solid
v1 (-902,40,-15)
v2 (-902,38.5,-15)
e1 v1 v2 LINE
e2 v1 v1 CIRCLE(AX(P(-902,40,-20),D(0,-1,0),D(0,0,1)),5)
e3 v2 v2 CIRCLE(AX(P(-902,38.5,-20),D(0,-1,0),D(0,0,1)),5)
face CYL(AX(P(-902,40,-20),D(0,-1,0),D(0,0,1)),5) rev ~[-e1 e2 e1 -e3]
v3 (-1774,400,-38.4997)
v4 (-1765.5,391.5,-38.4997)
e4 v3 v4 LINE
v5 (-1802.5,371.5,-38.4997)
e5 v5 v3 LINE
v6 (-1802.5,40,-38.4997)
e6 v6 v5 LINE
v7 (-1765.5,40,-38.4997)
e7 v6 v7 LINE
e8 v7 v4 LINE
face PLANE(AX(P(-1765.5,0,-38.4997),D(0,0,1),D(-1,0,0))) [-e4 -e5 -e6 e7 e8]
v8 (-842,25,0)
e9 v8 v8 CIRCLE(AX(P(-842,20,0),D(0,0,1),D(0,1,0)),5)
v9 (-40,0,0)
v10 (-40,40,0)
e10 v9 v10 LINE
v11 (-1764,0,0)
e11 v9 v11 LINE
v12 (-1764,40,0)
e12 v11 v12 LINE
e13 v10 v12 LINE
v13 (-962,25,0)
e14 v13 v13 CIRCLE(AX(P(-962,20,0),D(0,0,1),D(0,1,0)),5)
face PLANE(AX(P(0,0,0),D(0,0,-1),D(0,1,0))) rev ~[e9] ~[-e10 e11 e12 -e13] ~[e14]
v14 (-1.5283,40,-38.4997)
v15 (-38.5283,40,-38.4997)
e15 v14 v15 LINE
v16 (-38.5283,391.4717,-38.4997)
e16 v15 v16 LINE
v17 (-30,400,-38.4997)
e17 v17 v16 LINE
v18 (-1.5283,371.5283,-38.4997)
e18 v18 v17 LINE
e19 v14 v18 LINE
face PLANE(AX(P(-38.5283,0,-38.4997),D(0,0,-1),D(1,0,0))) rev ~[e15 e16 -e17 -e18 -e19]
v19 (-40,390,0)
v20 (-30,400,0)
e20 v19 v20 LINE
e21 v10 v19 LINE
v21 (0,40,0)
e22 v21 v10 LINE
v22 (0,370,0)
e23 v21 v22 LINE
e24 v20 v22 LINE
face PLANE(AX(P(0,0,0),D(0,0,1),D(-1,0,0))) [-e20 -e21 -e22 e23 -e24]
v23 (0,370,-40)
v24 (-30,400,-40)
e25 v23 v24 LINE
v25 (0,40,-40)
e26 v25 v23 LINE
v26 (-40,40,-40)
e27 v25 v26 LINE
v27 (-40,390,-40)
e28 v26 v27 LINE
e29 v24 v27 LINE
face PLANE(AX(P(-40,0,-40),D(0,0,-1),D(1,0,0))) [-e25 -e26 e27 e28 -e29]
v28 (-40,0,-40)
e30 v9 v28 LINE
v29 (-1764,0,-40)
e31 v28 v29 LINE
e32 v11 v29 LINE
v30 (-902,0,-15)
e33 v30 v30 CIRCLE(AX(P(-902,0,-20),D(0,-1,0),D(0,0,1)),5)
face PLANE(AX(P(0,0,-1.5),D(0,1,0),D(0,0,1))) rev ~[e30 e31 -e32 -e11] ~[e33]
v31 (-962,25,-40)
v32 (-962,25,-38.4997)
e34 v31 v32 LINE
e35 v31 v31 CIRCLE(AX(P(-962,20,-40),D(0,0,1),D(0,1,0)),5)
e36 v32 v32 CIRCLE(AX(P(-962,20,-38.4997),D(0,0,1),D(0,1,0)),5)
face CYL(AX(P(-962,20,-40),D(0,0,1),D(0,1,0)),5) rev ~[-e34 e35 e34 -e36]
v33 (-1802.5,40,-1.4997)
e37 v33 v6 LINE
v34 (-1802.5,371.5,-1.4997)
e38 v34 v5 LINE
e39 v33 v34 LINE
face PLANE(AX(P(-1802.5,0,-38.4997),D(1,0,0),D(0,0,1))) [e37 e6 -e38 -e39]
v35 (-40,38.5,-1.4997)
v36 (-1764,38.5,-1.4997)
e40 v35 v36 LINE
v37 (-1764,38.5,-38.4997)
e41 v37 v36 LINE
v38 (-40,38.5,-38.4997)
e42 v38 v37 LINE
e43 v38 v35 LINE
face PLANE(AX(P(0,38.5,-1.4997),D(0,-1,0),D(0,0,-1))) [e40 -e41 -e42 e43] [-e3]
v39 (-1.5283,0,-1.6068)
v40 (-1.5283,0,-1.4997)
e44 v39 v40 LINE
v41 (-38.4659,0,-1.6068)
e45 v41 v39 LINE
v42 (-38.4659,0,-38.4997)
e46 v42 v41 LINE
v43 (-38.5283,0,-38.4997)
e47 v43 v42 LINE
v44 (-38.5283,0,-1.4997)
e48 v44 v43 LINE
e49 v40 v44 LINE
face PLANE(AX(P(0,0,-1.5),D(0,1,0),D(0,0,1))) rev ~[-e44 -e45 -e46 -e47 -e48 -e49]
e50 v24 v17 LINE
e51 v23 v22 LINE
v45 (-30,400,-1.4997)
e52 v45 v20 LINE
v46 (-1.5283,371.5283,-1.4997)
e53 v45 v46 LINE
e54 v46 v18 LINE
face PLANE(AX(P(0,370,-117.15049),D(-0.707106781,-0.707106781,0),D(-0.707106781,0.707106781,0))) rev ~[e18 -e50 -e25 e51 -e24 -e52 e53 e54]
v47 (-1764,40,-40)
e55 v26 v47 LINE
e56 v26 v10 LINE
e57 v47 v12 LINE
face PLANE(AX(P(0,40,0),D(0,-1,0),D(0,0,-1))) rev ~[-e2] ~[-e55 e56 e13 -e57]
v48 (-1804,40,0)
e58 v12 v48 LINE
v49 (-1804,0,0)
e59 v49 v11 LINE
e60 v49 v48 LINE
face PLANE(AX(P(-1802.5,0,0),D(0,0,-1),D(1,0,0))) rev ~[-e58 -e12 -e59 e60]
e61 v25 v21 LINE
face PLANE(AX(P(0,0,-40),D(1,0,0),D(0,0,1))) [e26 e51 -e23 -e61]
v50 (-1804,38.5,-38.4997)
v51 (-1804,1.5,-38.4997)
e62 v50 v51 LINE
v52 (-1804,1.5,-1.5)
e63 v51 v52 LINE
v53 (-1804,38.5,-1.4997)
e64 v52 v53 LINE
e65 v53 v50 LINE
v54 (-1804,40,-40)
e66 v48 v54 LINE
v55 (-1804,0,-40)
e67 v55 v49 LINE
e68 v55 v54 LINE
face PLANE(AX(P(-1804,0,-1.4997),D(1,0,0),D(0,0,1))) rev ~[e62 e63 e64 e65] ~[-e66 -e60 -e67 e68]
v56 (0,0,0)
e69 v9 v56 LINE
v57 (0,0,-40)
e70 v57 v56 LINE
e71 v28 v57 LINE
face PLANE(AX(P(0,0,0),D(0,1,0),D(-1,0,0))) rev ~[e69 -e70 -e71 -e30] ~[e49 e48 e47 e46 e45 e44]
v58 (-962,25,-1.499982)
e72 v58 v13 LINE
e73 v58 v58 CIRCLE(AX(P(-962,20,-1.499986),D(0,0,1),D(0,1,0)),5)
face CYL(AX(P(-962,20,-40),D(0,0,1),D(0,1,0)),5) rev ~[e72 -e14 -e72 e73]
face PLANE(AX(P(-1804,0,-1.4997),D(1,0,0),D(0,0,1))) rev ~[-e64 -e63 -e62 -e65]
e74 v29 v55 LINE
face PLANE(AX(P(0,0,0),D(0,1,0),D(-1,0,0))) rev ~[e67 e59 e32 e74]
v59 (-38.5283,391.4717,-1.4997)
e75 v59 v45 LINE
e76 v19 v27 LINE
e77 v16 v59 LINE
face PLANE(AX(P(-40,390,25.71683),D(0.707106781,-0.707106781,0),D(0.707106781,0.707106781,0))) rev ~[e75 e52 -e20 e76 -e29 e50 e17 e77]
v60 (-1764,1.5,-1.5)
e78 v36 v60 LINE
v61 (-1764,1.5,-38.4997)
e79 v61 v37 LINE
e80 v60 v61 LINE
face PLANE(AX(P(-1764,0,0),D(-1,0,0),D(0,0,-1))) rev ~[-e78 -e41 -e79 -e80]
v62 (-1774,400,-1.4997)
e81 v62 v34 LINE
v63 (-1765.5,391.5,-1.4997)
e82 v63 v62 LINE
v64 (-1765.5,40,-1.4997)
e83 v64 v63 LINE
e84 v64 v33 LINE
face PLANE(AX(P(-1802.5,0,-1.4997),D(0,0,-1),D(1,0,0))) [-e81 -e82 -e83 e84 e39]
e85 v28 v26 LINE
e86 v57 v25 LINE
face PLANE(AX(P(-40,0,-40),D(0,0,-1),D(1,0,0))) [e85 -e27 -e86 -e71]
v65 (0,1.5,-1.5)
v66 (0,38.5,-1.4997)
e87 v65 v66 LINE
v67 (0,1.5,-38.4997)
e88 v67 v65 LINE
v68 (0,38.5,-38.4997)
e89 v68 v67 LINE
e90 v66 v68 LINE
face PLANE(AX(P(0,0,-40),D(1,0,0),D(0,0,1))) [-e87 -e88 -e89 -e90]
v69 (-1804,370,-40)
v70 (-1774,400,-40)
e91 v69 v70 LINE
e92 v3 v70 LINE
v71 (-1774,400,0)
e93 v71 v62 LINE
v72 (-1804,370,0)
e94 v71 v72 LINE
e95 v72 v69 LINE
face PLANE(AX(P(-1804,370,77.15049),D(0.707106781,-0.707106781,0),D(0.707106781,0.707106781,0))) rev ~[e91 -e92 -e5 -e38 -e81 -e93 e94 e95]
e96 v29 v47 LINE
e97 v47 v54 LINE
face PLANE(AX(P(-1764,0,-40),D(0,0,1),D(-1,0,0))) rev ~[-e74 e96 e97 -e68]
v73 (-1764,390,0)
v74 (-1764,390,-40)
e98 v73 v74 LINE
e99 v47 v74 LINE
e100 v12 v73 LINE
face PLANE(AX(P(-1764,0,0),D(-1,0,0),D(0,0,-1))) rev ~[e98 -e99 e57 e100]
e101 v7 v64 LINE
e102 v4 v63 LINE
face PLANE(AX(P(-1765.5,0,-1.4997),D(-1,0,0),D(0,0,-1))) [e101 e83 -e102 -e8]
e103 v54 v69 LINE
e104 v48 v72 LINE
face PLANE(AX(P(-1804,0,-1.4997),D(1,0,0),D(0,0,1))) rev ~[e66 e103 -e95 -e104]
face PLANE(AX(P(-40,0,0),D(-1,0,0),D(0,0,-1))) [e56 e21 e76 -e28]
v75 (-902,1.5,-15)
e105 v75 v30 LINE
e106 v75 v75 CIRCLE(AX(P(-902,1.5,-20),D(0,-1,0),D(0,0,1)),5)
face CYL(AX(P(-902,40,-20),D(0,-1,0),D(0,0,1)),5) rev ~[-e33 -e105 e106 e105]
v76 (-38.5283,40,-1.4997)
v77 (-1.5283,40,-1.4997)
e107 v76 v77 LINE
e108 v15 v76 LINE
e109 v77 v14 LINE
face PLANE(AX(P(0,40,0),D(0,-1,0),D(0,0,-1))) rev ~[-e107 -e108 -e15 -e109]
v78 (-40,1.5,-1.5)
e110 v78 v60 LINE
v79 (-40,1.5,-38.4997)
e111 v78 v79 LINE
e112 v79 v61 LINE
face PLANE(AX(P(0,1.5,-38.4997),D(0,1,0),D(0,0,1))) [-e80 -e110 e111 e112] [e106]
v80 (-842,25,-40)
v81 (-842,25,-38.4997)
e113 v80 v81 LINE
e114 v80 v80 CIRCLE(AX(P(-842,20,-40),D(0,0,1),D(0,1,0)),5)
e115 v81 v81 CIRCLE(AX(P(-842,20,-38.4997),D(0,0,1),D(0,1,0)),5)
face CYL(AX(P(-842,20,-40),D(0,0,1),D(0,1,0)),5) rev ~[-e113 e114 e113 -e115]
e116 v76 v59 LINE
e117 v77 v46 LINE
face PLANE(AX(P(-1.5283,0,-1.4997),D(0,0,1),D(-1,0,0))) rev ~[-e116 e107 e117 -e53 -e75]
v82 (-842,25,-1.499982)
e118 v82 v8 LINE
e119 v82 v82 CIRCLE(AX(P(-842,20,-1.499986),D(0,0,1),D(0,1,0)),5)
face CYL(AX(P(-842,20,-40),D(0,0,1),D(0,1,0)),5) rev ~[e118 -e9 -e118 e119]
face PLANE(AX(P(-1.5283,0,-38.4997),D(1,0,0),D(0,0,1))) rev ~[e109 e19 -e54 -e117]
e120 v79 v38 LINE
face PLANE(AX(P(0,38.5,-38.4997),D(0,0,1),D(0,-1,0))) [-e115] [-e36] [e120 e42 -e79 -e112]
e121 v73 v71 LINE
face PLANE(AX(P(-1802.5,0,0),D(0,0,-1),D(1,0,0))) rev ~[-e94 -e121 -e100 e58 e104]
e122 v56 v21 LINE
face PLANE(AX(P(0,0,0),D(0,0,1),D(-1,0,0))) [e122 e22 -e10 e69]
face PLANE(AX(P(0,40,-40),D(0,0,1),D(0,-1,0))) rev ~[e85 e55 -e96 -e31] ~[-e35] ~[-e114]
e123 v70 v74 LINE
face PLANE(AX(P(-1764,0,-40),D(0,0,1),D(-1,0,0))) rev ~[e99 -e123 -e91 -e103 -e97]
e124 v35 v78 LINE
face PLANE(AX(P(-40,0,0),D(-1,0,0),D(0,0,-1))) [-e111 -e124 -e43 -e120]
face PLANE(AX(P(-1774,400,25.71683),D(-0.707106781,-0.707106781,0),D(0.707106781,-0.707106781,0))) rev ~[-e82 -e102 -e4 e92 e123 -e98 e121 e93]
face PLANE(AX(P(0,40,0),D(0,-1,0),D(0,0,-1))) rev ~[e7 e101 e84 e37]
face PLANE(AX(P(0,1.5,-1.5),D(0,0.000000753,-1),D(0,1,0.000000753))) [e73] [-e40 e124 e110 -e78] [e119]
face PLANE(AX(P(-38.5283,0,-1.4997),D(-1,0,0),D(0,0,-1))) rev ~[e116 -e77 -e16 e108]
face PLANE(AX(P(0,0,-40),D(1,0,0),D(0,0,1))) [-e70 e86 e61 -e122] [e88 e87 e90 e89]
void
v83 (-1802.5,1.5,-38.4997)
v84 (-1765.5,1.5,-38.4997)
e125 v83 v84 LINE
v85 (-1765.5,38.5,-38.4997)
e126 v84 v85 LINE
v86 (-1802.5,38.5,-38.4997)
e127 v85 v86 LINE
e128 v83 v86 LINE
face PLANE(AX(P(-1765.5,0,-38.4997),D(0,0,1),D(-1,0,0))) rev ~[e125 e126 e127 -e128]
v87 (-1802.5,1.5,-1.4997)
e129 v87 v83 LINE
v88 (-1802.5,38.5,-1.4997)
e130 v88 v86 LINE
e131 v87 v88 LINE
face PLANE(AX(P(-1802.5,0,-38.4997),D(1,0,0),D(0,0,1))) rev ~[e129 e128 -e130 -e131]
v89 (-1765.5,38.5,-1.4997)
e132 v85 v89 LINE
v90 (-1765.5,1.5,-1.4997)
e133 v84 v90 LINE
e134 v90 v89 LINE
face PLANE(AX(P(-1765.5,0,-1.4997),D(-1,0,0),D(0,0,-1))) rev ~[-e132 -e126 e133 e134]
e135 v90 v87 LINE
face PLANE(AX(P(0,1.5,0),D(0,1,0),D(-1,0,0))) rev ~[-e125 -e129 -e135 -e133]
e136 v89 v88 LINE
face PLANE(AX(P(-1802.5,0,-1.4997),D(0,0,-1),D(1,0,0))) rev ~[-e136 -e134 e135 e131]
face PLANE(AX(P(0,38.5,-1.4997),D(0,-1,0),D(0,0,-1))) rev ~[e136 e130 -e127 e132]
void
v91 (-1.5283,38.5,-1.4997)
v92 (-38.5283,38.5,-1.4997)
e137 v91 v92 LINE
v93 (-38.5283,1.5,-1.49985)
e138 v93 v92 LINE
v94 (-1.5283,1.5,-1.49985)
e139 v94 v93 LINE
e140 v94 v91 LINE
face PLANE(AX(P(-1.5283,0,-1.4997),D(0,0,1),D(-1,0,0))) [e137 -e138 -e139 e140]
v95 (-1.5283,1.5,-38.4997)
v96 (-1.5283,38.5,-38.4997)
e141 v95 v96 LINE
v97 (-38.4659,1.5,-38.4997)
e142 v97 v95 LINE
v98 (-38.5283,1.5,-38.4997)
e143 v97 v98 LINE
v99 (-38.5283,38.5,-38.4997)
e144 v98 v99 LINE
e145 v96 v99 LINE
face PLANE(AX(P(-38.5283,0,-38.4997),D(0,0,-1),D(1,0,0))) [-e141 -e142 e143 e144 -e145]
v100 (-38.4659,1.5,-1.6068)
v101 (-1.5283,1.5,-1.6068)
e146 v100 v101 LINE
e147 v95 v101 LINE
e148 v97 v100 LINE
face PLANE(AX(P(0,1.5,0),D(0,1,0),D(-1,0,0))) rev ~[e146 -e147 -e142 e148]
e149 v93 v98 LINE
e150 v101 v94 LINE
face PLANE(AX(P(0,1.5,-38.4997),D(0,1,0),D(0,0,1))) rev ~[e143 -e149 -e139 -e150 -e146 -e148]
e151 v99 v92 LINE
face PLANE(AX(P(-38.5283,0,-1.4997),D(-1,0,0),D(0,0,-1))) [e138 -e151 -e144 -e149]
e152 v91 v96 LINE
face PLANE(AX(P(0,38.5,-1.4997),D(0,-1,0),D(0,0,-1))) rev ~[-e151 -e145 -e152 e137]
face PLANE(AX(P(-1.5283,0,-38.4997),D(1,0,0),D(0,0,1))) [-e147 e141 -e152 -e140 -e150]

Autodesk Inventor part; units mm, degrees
ref_plane "YZ Plane" through (0, 0, 0) normal (1, 0, 0) x (0, 1, 0)
ref_plane "XZ Plane" through (0, 0, 0) normal (0, 1, 0) x (-1, 0, 0)
ref_plane "XY Plane" through (0, 0, 0) normal (0, 0, 1) x (1, 0, 0)
sketch "Esboço1" plane through (0, 0, 0) normal (0, 1, 0) x (-1, 0, 0)
  line L0 (0, 0) -> (40, 0)
  line L1 (40, 0) -> (40, -40)
  line L2 (40, -40) -> (0, -40)
  line L3 (0, -40) -> (0, 0)
  line L4 (0, 0) -> (1.5, 0)
  line L5 (1.5283, -1.4997) -> (38.5283, -1.4997)
  line L6 (38.5283, -1.4997) -> (38.5283, -38.4997)
  line L7 (38.5283, -38.4997) -> (1.5283, -38.4997)
  line L8 (1.5283, -38.4997) -> (1.5283, -1.4997)
  line L9 (1804, 0) -> (1764, 0)
  line L10 (1764, 0) -> (1764, -40)
  line L11 (1764, -40) -> (1804, -40)
  line L12 (1804, -40) -> (1804, 0)
  line L13 (1804, 0) -> (1802.5, 0)
  line L14 (1804, -1.4997) -> (1804, 0)
  line L15 (1802.5, -1.4997) -> (1765.5, -1.4997)
  line L16 (1765.5, -1.4997) -> (1765.5, -38.4997)
  line L17 (1765.5, -38.4997) -> (1802.5, -38.4997)
  line L18 (1802.5, -38.4997) -> (1802.5, -1.4997)
  line L19 (38.5283, -1.4997) -> (1.5283, -1.4997)
  line L20 (1.5283, -1.4997) -> (1.5283, -38.4997)
  line L21 (1.5283, -38.4997) -> (38.5283, -38.4997)
  line L22 (38.5283, -38.4997) -> (38.5283, -1.4997)
  dimension "d0" = 40
  dimension "d1" = 40
  dimension "d2" = 1.5
  dimension "d3" = 1.5
  dimension "d4" = 37
  dimension "d5" = 37
  dimension "d6" = 1804
  dimension "d8" = 40
  dimension "d9" = 40
  dimension "d10" = 1.5
  dimension "d11" = 37
  dimension "d12" = 37
  dimension "d15" = 37
  dimension "d16" = 37
extrude "Extrusão1" add sketch "Esboço1" along normal blind 400
sketch "Esboço2" plane through (0, 0, 0) normal (0, 1, 0) x (-1, 0, 0)
  line L0 (38.4659, -1.6068) -> (1.4659, -1.6068)
  line L1 (1.4659, -1.6068) -> (1.4659, -38.6068)
  line L2 (1.4659, -38.6068) -> (38.4659, -38.6068)
  line L3 (38.4659, -38.6068) -> (38.4659, -1.6068)
  point P0 (0, 0)
  dimension "d17" = 37
  dimension "d18" = 37
extrude "Extrusão2" add sketch "Esboço2" along normal blind 1.5
sketch "Esboço3" plane through (0, 0, 0) normal (0, 1, 0) x (-1, 0, 0)
  line L0 (1802.5, -38.4997) -> (1765.5, -38.4997) projected
  line L1 (1765.5, -38.4997) -> (1765.5, -1.4997) projected
  line L2 (1802.5, -38.4997) -> (1765.5, -38.4997)
  line L3 (1765.5, -38.4997) -> (1765.5, -1.4997)
  line L4 (1765.5, -1.4997) -> (1802.5, -1.4997)
  line L5 (1802.5, -1.4997) -> (1802.5, -38.4997)
  point P0 (0, 0)
extrude "Extrusão3" add sketch "Esboço3" along normal blind 1.5
sketch "Esboço4" plane through (0, 0, 0) normal (0, 0, 1) x (1, 0, 0)
  line L0 (-40, 0) -> (-40, 400) projected
  line L1 (-40, 0) -> (-1764, 0)
  line L2 (-1764, 0) -> (-1764, 44.8822)
  line L3 (-40, 44.8822) -> (-40, 0)
  line L4 (-1764, 0) -> (-40, 0)
  line L5 (-40, 0) -> (-40, 40)
  line L6 (-40, 40) -> (-1764, 40)
  line L7 (-1764, 40) -> (-1764, 0)
  point P0 (0, 0)
  dimension "d23" = 1724
  dimension "d24" = 1724
  dimension "d25" = 40
sketch "Esboço7" plane through (0, 0, 0) normal (1, 0, 0) x (0, 1, 0)
  line L0 (0, 0) -> (1.5, 0)
  line L1 (1.5, 0) -> (1.5, -1.5)
  line L2 (1.5, -1.5) -> (0, -1.5)
  line L3 (0, -1.5) -> (0, 0)
  line L4 (1.5, -1.4997) -> (400, -1.4997) projected
  line L5 (1.5, -1.4997) -> (38.5, -1.4997)
  line L6 (38.5, -1.4997) -> (38.5, -38.4997)
  line L7 (38.5, -38.4997) -> (1.5, -38.4997)
  line L8 (1.5, -38.4997) -> (1.5, -1.4997)
  line L9 (0, 0) -> (400, 0) projected
  line L10 (0, 0) -> (40, 0)
  line L11 (40, 0) -> (40, -40)
  line L12 (40, -40) -> (0, -40)
  line L13 (0, -40) -> (0, 0)
  dimension "d44" = 1.5
  dimension "d45" = 1.5
  dimension "d46" = 37
  dimension "d47" = 37
  dimension "d48" = 40
  dimension "d49" = 40
extrude "Extrusão6" add sketch "Esboço7" against normal blind 1804 contours L0 L1 L2 L3 | L9 L11 L4 L1 | L2 L8 L7 L6 L4 L11 L12 L13
sketch "Esboço9" plane through (0, 0, -40) normal (0, 0, -1) x (-1, 0, 0)
  line L0 (40, 40) -> (1764, 40) projected
  line L1 (0, 0) -> (0, 400) projected
  point P0 (842, 20)
  point P1 (962, 20)
  point P2 (0, 373)
  dimension "d87" = 20
  dimension "d88" = 20
  dimension "d89" = 120
  dimension "d90" = 842
hole "Furo2" at (-842, 20, -40) at (-962, 20, -40) direction (0, 0, 1) diameter 10 depth 200
sketch "Esboço10" plane through (-1764, 40, -40) normal (0, 1, 0) x (1, 0, 0)
  line L0 (1764, -40) -> (1764, 0) projected
  line L1 (1724, -40) -> (0, -40) projected
  point P0 (862, -20)
  dimension "d98" = 902
  dimension "d99" = 20
hole "Furo3" at (-902, 40, -20) direction (0, -1, 0) diameter 10 depth 200
chamfer "Chanfro8" distance 30 angle 45 1 edges at (0, 400, -20)
chamfer "Chanfro9" distance 10 angle 45 1 edges at (-40, 400, -20)
chamfer "Chanfro10" distance 10 angle 45 1 edges at (-1764, 400, -20)
chamfer "Chanfro11" distance 30 angle 45 1 edges at (-1804, 400, -20)
properties part number "Base_Fundo_Suporte_Lamina"
